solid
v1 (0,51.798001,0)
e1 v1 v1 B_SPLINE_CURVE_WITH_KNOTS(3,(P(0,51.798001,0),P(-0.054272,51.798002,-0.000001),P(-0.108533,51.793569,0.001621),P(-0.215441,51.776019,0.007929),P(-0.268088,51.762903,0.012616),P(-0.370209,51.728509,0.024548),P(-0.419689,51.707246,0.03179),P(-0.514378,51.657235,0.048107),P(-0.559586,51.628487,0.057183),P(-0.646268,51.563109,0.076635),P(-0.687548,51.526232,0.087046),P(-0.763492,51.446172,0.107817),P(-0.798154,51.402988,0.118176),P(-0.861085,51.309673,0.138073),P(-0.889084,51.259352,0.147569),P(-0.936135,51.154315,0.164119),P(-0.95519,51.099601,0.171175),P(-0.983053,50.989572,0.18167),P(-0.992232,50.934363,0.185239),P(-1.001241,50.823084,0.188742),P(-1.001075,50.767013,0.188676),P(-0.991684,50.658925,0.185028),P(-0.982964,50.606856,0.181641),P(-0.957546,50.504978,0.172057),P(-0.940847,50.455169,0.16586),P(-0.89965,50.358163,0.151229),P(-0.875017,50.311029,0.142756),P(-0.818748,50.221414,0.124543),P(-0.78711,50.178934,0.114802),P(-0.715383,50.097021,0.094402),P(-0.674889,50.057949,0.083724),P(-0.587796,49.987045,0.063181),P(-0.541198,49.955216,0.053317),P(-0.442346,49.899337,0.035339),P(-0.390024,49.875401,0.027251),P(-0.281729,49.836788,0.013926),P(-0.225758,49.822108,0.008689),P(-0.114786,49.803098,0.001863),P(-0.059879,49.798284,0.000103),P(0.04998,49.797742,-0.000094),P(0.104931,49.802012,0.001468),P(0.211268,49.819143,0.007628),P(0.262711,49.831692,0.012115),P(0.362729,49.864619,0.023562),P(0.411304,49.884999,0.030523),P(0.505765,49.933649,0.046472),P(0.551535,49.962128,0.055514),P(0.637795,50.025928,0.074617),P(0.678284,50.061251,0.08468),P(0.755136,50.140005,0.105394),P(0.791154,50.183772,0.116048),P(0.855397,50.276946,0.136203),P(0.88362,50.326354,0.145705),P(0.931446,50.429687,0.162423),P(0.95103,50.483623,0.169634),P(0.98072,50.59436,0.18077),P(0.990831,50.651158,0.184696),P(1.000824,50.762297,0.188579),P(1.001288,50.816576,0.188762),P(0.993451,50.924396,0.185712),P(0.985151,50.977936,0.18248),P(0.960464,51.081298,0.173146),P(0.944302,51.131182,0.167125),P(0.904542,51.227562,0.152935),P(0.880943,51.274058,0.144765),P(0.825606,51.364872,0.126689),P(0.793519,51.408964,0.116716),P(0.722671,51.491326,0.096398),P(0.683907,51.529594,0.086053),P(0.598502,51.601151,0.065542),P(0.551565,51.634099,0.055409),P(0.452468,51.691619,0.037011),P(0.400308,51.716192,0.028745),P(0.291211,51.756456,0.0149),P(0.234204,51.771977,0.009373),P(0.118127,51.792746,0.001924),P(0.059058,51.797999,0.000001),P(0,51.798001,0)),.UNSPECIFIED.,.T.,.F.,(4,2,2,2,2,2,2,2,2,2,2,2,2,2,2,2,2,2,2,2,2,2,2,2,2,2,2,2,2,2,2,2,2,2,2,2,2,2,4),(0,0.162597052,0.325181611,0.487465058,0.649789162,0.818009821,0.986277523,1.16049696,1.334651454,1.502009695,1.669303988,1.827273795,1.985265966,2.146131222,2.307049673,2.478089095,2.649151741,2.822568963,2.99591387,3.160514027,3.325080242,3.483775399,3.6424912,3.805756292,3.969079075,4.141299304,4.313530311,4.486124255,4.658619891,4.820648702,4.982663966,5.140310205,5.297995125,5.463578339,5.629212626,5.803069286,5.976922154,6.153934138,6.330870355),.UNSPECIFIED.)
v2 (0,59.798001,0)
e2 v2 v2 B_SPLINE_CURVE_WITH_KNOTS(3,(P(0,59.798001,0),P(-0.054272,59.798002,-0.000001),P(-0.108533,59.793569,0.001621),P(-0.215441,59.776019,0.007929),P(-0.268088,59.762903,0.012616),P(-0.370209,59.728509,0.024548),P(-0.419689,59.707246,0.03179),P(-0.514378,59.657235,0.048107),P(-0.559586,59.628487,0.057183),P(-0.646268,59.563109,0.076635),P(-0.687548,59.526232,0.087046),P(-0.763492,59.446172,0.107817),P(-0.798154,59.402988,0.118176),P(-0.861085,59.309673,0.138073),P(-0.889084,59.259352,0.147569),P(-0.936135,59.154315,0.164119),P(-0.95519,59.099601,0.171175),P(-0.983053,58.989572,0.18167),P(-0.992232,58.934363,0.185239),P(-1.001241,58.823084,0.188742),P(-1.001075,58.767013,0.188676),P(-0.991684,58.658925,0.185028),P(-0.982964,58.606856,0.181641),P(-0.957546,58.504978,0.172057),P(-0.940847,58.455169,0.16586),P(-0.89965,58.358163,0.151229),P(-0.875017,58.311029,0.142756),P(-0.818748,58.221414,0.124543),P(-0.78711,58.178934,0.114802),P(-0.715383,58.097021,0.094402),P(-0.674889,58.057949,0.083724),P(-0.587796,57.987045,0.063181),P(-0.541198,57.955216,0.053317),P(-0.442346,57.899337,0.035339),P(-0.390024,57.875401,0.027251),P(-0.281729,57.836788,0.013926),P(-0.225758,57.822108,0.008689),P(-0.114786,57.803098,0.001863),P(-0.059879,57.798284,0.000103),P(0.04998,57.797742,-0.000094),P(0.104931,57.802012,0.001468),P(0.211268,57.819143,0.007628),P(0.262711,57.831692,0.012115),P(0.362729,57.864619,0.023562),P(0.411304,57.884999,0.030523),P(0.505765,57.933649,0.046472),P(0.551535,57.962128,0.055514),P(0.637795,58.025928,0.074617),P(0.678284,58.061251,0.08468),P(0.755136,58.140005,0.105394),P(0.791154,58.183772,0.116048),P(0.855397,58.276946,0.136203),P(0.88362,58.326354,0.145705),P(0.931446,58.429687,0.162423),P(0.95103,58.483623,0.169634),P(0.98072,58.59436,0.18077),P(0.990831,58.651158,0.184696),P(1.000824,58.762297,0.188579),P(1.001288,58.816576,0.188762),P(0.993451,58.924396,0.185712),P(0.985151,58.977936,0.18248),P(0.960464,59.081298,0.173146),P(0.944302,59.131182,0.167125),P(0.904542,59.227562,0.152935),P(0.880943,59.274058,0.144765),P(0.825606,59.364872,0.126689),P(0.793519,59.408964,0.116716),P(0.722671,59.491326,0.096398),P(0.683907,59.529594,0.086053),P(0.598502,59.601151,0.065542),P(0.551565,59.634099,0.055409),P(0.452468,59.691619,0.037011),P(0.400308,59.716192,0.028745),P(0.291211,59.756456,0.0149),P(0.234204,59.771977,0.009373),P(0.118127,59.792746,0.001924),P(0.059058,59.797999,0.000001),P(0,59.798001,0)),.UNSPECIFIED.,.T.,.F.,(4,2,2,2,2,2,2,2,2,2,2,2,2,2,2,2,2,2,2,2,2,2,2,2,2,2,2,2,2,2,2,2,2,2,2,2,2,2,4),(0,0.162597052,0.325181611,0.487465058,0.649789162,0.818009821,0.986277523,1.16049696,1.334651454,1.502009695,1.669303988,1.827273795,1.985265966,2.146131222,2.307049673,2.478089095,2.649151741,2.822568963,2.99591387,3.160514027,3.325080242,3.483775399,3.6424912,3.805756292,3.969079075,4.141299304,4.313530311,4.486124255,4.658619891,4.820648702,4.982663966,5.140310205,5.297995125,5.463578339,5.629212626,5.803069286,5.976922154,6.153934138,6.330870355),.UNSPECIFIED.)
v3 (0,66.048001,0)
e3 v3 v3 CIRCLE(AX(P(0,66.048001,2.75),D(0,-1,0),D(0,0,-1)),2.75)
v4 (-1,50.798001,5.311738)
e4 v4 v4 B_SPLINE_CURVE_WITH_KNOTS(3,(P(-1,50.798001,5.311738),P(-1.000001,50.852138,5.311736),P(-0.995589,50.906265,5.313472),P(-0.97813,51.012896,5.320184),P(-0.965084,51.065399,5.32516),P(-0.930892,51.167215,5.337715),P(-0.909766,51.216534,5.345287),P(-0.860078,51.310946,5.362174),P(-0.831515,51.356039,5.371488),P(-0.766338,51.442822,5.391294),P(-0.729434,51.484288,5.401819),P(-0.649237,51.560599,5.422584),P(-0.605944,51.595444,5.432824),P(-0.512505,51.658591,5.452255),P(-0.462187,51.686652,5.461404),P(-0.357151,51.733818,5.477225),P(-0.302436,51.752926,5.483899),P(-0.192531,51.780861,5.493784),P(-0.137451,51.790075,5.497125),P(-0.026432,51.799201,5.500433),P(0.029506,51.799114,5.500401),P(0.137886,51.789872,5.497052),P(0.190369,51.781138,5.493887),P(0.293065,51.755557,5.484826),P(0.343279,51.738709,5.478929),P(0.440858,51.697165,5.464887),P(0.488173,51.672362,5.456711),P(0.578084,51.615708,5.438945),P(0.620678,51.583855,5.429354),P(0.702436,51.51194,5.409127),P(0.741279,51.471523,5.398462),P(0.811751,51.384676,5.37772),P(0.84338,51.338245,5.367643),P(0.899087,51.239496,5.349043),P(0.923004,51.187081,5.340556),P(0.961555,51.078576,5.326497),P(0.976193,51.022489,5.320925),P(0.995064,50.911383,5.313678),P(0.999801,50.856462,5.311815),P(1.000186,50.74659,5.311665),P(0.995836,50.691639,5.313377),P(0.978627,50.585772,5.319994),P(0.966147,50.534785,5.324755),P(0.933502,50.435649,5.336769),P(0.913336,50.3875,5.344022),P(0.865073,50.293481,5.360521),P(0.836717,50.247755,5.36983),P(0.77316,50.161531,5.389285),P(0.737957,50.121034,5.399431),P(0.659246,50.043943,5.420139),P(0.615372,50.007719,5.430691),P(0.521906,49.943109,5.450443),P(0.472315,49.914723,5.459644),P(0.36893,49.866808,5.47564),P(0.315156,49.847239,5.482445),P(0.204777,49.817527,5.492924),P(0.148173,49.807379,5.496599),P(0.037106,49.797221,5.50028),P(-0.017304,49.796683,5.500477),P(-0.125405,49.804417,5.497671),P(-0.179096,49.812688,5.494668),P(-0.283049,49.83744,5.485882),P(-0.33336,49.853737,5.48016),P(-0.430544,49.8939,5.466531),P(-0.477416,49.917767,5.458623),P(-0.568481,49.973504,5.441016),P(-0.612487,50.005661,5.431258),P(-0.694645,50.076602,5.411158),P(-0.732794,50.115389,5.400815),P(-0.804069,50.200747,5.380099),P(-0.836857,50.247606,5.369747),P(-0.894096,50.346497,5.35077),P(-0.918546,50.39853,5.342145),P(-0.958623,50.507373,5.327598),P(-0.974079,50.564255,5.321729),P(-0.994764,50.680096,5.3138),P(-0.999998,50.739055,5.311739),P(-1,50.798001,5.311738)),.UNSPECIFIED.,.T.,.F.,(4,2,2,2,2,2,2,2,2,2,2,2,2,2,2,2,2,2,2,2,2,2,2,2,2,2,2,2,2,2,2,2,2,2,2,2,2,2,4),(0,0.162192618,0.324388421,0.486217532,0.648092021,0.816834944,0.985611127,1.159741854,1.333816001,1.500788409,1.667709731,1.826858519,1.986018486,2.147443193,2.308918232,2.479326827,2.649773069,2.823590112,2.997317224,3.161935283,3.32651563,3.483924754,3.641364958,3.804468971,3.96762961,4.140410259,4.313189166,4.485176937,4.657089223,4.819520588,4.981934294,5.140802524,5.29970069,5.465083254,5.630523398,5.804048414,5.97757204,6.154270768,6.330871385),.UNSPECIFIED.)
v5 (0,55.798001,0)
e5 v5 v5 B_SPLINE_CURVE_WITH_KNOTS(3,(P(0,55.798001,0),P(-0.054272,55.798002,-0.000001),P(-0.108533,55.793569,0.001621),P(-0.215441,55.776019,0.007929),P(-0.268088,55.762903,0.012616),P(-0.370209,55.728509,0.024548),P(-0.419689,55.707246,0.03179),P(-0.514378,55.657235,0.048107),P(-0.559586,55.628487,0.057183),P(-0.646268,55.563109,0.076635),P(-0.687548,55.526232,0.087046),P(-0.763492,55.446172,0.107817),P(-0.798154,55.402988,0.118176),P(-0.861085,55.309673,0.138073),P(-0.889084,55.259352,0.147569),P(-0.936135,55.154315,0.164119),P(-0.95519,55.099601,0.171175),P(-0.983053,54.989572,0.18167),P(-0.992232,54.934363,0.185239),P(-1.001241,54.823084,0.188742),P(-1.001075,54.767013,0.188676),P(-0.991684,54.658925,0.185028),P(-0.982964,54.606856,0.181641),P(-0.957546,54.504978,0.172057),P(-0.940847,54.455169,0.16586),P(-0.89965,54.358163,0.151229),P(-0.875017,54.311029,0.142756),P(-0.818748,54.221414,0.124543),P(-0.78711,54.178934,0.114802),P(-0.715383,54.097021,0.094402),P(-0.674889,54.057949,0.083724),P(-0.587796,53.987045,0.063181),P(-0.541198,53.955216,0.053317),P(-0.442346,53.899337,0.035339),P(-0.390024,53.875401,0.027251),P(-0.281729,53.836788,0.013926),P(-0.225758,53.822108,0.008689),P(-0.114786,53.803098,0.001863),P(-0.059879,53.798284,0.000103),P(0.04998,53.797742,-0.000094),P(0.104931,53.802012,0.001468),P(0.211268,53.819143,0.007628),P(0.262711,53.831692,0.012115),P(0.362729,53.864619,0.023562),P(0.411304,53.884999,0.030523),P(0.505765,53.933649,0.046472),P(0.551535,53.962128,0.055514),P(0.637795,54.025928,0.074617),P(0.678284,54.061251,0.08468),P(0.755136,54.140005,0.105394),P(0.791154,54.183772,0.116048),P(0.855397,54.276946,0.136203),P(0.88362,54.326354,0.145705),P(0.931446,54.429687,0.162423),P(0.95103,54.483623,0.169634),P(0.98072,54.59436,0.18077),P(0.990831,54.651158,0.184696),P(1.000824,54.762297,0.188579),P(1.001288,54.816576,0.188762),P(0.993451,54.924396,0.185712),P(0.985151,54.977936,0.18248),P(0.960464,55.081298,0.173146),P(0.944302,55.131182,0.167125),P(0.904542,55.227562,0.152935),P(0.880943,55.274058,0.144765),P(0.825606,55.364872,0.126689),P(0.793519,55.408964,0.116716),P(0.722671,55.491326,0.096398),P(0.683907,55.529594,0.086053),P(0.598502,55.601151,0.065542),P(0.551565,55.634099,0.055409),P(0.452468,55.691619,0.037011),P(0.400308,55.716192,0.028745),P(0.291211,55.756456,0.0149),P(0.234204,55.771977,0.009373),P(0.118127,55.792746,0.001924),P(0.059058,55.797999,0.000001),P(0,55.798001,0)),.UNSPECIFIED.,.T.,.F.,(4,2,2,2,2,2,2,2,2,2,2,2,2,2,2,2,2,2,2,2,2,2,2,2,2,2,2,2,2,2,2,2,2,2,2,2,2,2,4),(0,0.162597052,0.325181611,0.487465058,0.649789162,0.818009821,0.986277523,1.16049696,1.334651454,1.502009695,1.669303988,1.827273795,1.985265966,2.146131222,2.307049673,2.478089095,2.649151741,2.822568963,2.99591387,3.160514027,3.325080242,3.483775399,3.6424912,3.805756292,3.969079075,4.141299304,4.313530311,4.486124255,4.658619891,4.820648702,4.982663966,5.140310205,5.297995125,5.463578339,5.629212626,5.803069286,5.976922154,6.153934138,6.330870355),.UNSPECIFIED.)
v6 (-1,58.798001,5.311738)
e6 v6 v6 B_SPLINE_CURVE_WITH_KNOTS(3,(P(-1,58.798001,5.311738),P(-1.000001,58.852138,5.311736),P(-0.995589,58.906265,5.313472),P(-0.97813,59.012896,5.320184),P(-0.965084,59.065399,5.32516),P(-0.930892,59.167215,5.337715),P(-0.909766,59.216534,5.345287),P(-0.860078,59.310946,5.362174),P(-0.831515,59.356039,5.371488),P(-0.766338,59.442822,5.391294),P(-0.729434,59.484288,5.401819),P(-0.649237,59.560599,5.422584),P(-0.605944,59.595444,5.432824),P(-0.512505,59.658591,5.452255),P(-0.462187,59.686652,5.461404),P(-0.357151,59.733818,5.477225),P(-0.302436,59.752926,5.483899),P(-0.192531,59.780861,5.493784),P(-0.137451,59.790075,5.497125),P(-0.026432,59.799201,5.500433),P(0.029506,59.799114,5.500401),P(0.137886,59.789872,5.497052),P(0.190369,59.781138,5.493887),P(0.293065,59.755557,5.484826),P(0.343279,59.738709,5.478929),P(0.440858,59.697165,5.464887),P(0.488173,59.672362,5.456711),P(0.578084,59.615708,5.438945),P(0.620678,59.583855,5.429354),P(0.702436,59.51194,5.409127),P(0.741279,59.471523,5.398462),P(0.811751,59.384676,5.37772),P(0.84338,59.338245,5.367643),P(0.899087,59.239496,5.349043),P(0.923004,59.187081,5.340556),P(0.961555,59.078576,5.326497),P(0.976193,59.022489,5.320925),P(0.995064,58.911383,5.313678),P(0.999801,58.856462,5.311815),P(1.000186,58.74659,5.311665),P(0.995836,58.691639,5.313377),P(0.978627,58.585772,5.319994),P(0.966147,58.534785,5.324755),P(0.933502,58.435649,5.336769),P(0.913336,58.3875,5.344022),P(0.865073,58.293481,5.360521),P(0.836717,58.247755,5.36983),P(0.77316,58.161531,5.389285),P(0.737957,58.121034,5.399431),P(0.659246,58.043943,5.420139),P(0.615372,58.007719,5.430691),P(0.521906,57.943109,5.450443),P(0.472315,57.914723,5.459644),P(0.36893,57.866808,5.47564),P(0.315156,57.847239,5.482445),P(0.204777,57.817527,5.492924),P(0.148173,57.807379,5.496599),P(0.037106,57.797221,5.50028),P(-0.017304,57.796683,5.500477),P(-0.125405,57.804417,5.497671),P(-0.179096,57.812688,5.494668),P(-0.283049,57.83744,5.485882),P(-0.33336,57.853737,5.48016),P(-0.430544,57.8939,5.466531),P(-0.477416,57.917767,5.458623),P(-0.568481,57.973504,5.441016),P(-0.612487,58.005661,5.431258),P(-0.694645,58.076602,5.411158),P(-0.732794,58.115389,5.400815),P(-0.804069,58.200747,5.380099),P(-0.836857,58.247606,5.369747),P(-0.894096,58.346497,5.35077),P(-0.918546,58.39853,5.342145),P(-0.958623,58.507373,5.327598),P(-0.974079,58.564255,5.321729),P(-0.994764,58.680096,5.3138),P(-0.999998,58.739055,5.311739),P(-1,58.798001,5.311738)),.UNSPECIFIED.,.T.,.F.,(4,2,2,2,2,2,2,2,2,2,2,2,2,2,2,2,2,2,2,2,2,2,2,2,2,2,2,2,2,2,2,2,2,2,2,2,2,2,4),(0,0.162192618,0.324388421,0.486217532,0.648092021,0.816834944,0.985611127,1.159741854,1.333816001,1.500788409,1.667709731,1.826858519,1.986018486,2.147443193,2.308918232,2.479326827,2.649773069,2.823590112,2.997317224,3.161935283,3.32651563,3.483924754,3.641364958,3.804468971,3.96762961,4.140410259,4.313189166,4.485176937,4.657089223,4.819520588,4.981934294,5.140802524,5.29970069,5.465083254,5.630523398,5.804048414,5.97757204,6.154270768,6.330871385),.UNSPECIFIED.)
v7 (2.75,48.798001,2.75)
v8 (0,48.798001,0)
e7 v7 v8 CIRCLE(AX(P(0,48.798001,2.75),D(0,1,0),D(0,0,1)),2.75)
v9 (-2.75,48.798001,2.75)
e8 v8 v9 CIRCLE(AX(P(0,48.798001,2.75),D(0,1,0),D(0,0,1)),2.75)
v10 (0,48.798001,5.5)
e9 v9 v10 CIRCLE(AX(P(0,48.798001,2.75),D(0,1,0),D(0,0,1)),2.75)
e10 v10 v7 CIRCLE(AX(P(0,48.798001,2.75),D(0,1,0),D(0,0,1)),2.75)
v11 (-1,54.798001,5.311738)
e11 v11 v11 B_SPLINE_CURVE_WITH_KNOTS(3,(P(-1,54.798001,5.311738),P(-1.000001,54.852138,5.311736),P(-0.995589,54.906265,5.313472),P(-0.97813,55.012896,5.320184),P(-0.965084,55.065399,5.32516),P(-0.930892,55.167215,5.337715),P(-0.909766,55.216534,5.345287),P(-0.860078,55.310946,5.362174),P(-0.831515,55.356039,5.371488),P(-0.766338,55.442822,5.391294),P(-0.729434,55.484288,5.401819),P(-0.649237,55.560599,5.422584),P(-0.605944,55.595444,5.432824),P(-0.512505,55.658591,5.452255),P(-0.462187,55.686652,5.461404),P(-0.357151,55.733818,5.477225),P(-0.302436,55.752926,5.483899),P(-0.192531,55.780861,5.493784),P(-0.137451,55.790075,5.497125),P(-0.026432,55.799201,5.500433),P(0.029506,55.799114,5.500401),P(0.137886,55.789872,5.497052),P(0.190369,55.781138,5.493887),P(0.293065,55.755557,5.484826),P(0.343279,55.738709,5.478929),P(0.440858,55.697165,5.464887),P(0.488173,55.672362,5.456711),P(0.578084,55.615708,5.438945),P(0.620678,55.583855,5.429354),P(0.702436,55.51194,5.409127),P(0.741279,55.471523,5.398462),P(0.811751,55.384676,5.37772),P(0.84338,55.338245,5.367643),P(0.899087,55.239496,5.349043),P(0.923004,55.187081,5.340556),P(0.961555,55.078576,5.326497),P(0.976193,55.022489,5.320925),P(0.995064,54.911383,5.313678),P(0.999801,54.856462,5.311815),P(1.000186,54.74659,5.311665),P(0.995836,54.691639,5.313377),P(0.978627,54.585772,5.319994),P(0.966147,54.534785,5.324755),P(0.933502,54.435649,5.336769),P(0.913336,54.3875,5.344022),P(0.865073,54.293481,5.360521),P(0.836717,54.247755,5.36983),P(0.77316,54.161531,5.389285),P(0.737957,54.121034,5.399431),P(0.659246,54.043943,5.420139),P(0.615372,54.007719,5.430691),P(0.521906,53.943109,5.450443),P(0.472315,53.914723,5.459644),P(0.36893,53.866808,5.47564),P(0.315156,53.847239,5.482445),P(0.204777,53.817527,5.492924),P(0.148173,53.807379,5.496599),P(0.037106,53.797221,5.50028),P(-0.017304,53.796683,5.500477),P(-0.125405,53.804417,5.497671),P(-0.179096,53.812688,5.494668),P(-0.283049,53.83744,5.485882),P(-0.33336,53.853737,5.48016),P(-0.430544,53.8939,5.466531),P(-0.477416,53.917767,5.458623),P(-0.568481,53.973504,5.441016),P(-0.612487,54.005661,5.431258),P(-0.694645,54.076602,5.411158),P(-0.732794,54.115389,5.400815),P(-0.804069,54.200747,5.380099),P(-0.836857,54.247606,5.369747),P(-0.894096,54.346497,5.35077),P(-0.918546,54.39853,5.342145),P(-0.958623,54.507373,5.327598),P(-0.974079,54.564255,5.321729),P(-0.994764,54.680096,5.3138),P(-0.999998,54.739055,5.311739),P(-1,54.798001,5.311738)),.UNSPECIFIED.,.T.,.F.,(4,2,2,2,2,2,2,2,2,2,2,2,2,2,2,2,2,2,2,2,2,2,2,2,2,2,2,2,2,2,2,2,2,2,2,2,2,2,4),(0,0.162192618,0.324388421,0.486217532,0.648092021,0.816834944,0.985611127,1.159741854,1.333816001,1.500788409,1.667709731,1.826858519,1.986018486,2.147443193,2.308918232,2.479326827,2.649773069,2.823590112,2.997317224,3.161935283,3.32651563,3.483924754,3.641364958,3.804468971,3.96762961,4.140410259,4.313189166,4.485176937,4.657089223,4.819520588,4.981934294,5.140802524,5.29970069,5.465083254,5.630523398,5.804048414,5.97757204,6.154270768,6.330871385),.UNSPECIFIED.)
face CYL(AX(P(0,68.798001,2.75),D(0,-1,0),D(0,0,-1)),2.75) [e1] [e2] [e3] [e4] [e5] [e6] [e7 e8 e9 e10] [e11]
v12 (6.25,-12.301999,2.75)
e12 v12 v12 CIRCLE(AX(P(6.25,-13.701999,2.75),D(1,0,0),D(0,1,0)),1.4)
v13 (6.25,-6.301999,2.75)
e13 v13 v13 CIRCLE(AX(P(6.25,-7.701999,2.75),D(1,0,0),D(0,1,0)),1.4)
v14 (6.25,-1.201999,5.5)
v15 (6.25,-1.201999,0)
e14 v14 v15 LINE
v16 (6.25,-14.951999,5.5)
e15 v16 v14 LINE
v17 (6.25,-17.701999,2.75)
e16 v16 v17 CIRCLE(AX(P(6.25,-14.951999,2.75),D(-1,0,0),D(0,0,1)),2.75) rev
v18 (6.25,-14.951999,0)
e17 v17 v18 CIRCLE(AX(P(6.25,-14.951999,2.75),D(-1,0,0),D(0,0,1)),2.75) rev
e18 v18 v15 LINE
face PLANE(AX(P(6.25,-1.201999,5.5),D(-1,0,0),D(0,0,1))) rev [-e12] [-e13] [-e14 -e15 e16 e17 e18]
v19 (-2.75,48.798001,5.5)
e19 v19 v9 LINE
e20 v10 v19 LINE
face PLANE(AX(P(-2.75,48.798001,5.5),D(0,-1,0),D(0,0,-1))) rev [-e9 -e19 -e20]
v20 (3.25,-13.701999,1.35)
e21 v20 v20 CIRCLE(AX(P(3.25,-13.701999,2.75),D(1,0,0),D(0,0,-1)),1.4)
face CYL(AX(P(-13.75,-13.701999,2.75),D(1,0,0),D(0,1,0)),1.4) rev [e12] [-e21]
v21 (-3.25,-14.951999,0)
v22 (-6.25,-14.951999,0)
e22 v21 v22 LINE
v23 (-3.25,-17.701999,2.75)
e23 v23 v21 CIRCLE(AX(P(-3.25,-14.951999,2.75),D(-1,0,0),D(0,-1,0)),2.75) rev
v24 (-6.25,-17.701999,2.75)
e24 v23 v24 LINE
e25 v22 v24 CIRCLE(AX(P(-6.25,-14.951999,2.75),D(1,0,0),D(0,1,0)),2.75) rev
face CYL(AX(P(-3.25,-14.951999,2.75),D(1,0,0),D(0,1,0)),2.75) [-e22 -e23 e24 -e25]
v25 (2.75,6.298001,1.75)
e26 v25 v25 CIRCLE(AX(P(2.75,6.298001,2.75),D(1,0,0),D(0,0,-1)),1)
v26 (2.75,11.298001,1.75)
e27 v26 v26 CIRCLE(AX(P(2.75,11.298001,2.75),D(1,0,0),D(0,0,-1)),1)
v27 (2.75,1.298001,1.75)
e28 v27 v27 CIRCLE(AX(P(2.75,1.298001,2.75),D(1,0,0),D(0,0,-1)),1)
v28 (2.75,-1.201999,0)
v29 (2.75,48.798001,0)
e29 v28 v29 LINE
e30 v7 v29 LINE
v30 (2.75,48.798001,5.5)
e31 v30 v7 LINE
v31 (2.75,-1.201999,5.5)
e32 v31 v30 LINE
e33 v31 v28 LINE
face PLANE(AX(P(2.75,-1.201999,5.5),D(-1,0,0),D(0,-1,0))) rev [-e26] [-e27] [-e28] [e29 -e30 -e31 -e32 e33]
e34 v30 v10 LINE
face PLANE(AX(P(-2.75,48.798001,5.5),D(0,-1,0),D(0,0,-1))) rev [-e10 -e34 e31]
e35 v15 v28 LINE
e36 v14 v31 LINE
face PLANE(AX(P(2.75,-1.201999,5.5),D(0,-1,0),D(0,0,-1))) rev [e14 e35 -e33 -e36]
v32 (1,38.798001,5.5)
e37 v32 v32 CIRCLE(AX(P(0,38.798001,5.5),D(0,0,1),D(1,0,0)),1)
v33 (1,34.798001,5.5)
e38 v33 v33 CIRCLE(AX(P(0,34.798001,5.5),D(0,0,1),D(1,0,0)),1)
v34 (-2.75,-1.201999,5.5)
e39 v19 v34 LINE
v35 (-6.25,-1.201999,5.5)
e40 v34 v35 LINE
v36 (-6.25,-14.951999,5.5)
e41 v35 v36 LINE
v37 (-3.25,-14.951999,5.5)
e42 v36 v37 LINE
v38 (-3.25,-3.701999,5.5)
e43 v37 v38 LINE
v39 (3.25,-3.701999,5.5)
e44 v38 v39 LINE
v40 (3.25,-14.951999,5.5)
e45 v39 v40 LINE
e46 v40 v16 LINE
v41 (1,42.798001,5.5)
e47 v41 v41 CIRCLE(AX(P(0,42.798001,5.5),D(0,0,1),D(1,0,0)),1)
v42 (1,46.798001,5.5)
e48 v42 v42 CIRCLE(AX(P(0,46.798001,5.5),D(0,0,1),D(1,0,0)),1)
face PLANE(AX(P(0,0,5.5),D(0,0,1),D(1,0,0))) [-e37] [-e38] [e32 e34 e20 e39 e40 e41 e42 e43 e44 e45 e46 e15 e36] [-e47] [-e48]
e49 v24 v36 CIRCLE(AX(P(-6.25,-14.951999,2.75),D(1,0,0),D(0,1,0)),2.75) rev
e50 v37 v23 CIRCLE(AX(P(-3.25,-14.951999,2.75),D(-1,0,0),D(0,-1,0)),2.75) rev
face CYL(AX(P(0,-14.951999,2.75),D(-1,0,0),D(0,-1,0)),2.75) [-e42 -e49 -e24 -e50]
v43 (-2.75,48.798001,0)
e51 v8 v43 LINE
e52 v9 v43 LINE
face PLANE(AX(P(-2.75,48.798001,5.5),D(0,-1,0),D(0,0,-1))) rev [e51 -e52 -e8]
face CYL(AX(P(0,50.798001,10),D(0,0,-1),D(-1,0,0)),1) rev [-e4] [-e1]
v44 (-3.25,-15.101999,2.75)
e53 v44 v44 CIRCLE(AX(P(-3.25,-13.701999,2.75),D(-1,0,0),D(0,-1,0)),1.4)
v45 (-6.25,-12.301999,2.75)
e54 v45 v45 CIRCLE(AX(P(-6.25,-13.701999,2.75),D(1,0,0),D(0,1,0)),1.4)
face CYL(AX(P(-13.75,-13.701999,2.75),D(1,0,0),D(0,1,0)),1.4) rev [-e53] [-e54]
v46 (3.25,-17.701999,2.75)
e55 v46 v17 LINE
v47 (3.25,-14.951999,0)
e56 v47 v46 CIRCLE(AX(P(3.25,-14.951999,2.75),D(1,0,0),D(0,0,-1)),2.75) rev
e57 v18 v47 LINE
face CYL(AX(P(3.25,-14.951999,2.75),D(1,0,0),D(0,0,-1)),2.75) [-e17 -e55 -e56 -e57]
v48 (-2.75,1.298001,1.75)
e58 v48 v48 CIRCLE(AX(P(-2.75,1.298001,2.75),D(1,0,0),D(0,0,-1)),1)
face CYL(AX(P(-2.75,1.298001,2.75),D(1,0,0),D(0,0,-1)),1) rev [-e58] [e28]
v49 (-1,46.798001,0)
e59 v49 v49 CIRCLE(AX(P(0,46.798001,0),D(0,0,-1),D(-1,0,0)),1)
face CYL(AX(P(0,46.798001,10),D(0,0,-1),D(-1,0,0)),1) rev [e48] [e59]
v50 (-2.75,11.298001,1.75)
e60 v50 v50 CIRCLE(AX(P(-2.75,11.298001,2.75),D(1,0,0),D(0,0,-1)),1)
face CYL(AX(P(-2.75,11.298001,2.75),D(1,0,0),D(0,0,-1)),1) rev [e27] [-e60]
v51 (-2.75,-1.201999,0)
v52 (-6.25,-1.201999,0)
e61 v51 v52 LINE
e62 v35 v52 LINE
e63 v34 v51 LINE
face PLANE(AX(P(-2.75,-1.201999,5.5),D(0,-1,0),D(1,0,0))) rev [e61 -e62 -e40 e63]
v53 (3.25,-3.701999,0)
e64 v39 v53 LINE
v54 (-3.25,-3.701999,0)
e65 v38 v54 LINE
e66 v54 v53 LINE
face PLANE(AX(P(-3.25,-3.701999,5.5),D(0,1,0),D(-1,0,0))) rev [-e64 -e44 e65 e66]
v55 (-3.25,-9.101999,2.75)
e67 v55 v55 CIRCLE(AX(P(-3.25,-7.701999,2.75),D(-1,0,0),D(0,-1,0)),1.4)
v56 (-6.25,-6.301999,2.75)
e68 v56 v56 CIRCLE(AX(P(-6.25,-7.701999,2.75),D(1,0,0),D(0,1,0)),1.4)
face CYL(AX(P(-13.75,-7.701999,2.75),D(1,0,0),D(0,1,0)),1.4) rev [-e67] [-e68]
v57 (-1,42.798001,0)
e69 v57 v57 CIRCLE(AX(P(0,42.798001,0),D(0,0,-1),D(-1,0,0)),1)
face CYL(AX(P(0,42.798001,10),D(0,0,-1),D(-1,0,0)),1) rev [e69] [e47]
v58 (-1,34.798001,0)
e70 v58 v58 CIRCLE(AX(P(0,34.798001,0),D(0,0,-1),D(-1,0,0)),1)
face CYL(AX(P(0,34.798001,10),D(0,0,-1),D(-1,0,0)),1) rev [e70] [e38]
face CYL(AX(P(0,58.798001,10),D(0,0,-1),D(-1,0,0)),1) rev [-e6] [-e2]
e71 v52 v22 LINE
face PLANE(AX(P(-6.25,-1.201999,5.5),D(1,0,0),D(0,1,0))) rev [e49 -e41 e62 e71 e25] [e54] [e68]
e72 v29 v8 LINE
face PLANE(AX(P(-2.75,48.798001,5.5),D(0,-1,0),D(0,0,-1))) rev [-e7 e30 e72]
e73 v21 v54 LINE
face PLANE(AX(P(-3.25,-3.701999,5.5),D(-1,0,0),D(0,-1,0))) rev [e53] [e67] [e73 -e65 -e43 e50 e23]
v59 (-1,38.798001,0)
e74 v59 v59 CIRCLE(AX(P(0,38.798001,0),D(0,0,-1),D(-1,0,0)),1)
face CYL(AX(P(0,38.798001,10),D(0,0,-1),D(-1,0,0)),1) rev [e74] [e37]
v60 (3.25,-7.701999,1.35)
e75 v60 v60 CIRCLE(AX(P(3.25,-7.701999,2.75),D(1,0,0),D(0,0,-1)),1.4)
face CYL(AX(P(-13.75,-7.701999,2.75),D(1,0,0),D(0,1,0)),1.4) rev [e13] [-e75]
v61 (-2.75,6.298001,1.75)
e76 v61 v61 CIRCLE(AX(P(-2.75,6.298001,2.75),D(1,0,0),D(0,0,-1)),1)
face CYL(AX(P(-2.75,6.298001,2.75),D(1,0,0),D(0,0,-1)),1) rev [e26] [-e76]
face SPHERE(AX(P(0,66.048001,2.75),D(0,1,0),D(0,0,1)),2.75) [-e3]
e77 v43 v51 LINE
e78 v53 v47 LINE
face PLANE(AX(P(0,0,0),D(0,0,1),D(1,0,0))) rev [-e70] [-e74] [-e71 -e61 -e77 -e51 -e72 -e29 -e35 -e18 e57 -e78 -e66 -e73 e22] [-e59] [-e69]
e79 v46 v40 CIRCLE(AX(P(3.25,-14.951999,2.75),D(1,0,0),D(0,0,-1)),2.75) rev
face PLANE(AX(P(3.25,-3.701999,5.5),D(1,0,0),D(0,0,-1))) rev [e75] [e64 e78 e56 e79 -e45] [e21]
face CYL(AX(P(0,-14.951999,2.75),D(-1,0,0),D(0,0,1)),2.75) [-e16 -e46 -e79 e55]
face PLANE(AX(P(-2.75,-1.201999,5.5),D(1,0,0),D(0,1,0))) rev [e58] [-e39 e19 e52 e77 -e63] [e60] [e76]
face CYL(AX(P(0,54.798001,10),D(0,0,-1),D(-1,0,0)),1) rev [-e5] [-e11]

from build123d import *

# Parameters (mm, degrees)
BOSS_EXTRUDE1_DEPTH = 5.5
SKETCH2_R           = 1
CUT_EXTRUDE1_DEPTH  = 5.5
SKETCH3_R           = 1.4
CUT_EXTRUDE2_DEPTH  = 20
SKETCH4_R           = 2.75
BOSS_EXTRUDE2_DEPTH = 20
FILLET1_R           = 2.75
FILLET2_R           = 2.75
SKETCH6_R           = 1
CUT_EXTRUDE4_DEPTH  = 10


with BuildPart() as part:
    # Sketch1 → Boss-Extrude1 (new body)
    with BuildSketch(Plane.XY):
        Polygon((-6.25, -1.20199904), (-6.25, -17.70199904), (-3.25, -17.70199904), (-3.25, -3.70199904), (3.25, -3.70199904), (3.25, -17.70199904), (6.25, -17.70199904), (6.25, -1.20199904), (2.75, -1.20199904), (2.75, 48.79800096), (-2.75, 48.79800096), (-2.75, -1.20199904), align=None)
    extrude(amount=BOSS_EXTRUDE1_DEPTH)

    # Sketch2 → Cut-Extrude1 (cut)
    with BuildSketch(Plane(origin=(2.75, 0, 0), x_dir=(0, 0, -1), z_dir=(1, 0, 0))):
        with Locations((-2.75, 1.29800096)):
            Circle(SKETCH2_R)
        with Locations((-2.75, 6.29800096)):
            Circle(SKETCH2_R)
        with Locations((-2.75, 11.29800096)):
            Circle(SKETCH2_R)
    extrude(amount=-CUT_EXTRUDE1_DEPTH, mode=Mode.SUBTRACT)

    # Sketch3 → Cut-Extrude2 (cut)
    with BuildSketch(Plane(origin=(6.25, 0, 0), x_dir=(0, 0, -1), z_dir=(1, 0, 0))):
        with Locations(Location((-2.75, -7.70199904, 0), (0, 0, 90))):
            Circle(SKETCH3_R)
        with Locations(Location((-2.75, -13.70199904, 0), (0, 0, 90))):
            Circle(SKETCH3_R)
    extrude(amount=-CUT_EXTRUDE2_DEPTH, mode=Mode.SUBTRACT)

    # Sketch4 → Boss-Extrude2 (add)
    with BuildSketch(Plane(origin=(0, 48.79800096, 0), x_dir=(1, 0, 0), z_dir=(0, 1, 0))):
        with Locations(Location((0, -2.75, 0), (0, 0, 270))):
            Circle(SKETCH4_R)
    extrude(amount=BOSS_EXTRUDE2_DEPTH)

    # Fillet1
    fillet1_edges = [part.edges().sort_by_distance(p)[0] for p in [
        (0, 68.79800096, 0),
    ]]
    fillet(fillet1_edges, radius=FILLET1_R)

    # Fillet2
    fillet2_edges = [part.edges().sort_by_distance(p)[0] for p in [
        (4.75, -17.70199904, 5.5),
        (4.75, -17.70199904, 0),
        (-4.75, -17.70199904, 0),
        (-4.75, -17.70199904, 5.5),
    ]]
    fillet(fillet2_edges, radius=FILLET2_R - 0.0001)  # a hair under: the kernel refuses the full size

    # Sketch6 → Cut-Extrude4 (cut)
    with BuildSketch(Plane(origin=(0, 0, 0), x_dir=(-1, 0, 0), z_dir=(0, 0, -1))):
        with Locations((0, 46.79800096)):
            Circle(SKETCH6_R)
        with Locations((0, 42.79800096)):
            Circle(SKETCH6_R)
        with Locations((0, 38.79800096)):
            Circle(SKETCH6_R)
        with Locations((0, 34.79800096)):
            Circle(SKETCH6_R)
        with Locations((0, 50.79800096)):
            Circle(SKETCH6_R)
        with Locations((0, 54.79800096)):
            Circle(SKETCH6_R)
        with Locations((0, 58.79800096)):
            Circle(SKETCH6_R)
    extrude(amount=-CUT_EXTRUDE4_DEPTH, mode=Mode.SUBTRACT)


solid = part.part
